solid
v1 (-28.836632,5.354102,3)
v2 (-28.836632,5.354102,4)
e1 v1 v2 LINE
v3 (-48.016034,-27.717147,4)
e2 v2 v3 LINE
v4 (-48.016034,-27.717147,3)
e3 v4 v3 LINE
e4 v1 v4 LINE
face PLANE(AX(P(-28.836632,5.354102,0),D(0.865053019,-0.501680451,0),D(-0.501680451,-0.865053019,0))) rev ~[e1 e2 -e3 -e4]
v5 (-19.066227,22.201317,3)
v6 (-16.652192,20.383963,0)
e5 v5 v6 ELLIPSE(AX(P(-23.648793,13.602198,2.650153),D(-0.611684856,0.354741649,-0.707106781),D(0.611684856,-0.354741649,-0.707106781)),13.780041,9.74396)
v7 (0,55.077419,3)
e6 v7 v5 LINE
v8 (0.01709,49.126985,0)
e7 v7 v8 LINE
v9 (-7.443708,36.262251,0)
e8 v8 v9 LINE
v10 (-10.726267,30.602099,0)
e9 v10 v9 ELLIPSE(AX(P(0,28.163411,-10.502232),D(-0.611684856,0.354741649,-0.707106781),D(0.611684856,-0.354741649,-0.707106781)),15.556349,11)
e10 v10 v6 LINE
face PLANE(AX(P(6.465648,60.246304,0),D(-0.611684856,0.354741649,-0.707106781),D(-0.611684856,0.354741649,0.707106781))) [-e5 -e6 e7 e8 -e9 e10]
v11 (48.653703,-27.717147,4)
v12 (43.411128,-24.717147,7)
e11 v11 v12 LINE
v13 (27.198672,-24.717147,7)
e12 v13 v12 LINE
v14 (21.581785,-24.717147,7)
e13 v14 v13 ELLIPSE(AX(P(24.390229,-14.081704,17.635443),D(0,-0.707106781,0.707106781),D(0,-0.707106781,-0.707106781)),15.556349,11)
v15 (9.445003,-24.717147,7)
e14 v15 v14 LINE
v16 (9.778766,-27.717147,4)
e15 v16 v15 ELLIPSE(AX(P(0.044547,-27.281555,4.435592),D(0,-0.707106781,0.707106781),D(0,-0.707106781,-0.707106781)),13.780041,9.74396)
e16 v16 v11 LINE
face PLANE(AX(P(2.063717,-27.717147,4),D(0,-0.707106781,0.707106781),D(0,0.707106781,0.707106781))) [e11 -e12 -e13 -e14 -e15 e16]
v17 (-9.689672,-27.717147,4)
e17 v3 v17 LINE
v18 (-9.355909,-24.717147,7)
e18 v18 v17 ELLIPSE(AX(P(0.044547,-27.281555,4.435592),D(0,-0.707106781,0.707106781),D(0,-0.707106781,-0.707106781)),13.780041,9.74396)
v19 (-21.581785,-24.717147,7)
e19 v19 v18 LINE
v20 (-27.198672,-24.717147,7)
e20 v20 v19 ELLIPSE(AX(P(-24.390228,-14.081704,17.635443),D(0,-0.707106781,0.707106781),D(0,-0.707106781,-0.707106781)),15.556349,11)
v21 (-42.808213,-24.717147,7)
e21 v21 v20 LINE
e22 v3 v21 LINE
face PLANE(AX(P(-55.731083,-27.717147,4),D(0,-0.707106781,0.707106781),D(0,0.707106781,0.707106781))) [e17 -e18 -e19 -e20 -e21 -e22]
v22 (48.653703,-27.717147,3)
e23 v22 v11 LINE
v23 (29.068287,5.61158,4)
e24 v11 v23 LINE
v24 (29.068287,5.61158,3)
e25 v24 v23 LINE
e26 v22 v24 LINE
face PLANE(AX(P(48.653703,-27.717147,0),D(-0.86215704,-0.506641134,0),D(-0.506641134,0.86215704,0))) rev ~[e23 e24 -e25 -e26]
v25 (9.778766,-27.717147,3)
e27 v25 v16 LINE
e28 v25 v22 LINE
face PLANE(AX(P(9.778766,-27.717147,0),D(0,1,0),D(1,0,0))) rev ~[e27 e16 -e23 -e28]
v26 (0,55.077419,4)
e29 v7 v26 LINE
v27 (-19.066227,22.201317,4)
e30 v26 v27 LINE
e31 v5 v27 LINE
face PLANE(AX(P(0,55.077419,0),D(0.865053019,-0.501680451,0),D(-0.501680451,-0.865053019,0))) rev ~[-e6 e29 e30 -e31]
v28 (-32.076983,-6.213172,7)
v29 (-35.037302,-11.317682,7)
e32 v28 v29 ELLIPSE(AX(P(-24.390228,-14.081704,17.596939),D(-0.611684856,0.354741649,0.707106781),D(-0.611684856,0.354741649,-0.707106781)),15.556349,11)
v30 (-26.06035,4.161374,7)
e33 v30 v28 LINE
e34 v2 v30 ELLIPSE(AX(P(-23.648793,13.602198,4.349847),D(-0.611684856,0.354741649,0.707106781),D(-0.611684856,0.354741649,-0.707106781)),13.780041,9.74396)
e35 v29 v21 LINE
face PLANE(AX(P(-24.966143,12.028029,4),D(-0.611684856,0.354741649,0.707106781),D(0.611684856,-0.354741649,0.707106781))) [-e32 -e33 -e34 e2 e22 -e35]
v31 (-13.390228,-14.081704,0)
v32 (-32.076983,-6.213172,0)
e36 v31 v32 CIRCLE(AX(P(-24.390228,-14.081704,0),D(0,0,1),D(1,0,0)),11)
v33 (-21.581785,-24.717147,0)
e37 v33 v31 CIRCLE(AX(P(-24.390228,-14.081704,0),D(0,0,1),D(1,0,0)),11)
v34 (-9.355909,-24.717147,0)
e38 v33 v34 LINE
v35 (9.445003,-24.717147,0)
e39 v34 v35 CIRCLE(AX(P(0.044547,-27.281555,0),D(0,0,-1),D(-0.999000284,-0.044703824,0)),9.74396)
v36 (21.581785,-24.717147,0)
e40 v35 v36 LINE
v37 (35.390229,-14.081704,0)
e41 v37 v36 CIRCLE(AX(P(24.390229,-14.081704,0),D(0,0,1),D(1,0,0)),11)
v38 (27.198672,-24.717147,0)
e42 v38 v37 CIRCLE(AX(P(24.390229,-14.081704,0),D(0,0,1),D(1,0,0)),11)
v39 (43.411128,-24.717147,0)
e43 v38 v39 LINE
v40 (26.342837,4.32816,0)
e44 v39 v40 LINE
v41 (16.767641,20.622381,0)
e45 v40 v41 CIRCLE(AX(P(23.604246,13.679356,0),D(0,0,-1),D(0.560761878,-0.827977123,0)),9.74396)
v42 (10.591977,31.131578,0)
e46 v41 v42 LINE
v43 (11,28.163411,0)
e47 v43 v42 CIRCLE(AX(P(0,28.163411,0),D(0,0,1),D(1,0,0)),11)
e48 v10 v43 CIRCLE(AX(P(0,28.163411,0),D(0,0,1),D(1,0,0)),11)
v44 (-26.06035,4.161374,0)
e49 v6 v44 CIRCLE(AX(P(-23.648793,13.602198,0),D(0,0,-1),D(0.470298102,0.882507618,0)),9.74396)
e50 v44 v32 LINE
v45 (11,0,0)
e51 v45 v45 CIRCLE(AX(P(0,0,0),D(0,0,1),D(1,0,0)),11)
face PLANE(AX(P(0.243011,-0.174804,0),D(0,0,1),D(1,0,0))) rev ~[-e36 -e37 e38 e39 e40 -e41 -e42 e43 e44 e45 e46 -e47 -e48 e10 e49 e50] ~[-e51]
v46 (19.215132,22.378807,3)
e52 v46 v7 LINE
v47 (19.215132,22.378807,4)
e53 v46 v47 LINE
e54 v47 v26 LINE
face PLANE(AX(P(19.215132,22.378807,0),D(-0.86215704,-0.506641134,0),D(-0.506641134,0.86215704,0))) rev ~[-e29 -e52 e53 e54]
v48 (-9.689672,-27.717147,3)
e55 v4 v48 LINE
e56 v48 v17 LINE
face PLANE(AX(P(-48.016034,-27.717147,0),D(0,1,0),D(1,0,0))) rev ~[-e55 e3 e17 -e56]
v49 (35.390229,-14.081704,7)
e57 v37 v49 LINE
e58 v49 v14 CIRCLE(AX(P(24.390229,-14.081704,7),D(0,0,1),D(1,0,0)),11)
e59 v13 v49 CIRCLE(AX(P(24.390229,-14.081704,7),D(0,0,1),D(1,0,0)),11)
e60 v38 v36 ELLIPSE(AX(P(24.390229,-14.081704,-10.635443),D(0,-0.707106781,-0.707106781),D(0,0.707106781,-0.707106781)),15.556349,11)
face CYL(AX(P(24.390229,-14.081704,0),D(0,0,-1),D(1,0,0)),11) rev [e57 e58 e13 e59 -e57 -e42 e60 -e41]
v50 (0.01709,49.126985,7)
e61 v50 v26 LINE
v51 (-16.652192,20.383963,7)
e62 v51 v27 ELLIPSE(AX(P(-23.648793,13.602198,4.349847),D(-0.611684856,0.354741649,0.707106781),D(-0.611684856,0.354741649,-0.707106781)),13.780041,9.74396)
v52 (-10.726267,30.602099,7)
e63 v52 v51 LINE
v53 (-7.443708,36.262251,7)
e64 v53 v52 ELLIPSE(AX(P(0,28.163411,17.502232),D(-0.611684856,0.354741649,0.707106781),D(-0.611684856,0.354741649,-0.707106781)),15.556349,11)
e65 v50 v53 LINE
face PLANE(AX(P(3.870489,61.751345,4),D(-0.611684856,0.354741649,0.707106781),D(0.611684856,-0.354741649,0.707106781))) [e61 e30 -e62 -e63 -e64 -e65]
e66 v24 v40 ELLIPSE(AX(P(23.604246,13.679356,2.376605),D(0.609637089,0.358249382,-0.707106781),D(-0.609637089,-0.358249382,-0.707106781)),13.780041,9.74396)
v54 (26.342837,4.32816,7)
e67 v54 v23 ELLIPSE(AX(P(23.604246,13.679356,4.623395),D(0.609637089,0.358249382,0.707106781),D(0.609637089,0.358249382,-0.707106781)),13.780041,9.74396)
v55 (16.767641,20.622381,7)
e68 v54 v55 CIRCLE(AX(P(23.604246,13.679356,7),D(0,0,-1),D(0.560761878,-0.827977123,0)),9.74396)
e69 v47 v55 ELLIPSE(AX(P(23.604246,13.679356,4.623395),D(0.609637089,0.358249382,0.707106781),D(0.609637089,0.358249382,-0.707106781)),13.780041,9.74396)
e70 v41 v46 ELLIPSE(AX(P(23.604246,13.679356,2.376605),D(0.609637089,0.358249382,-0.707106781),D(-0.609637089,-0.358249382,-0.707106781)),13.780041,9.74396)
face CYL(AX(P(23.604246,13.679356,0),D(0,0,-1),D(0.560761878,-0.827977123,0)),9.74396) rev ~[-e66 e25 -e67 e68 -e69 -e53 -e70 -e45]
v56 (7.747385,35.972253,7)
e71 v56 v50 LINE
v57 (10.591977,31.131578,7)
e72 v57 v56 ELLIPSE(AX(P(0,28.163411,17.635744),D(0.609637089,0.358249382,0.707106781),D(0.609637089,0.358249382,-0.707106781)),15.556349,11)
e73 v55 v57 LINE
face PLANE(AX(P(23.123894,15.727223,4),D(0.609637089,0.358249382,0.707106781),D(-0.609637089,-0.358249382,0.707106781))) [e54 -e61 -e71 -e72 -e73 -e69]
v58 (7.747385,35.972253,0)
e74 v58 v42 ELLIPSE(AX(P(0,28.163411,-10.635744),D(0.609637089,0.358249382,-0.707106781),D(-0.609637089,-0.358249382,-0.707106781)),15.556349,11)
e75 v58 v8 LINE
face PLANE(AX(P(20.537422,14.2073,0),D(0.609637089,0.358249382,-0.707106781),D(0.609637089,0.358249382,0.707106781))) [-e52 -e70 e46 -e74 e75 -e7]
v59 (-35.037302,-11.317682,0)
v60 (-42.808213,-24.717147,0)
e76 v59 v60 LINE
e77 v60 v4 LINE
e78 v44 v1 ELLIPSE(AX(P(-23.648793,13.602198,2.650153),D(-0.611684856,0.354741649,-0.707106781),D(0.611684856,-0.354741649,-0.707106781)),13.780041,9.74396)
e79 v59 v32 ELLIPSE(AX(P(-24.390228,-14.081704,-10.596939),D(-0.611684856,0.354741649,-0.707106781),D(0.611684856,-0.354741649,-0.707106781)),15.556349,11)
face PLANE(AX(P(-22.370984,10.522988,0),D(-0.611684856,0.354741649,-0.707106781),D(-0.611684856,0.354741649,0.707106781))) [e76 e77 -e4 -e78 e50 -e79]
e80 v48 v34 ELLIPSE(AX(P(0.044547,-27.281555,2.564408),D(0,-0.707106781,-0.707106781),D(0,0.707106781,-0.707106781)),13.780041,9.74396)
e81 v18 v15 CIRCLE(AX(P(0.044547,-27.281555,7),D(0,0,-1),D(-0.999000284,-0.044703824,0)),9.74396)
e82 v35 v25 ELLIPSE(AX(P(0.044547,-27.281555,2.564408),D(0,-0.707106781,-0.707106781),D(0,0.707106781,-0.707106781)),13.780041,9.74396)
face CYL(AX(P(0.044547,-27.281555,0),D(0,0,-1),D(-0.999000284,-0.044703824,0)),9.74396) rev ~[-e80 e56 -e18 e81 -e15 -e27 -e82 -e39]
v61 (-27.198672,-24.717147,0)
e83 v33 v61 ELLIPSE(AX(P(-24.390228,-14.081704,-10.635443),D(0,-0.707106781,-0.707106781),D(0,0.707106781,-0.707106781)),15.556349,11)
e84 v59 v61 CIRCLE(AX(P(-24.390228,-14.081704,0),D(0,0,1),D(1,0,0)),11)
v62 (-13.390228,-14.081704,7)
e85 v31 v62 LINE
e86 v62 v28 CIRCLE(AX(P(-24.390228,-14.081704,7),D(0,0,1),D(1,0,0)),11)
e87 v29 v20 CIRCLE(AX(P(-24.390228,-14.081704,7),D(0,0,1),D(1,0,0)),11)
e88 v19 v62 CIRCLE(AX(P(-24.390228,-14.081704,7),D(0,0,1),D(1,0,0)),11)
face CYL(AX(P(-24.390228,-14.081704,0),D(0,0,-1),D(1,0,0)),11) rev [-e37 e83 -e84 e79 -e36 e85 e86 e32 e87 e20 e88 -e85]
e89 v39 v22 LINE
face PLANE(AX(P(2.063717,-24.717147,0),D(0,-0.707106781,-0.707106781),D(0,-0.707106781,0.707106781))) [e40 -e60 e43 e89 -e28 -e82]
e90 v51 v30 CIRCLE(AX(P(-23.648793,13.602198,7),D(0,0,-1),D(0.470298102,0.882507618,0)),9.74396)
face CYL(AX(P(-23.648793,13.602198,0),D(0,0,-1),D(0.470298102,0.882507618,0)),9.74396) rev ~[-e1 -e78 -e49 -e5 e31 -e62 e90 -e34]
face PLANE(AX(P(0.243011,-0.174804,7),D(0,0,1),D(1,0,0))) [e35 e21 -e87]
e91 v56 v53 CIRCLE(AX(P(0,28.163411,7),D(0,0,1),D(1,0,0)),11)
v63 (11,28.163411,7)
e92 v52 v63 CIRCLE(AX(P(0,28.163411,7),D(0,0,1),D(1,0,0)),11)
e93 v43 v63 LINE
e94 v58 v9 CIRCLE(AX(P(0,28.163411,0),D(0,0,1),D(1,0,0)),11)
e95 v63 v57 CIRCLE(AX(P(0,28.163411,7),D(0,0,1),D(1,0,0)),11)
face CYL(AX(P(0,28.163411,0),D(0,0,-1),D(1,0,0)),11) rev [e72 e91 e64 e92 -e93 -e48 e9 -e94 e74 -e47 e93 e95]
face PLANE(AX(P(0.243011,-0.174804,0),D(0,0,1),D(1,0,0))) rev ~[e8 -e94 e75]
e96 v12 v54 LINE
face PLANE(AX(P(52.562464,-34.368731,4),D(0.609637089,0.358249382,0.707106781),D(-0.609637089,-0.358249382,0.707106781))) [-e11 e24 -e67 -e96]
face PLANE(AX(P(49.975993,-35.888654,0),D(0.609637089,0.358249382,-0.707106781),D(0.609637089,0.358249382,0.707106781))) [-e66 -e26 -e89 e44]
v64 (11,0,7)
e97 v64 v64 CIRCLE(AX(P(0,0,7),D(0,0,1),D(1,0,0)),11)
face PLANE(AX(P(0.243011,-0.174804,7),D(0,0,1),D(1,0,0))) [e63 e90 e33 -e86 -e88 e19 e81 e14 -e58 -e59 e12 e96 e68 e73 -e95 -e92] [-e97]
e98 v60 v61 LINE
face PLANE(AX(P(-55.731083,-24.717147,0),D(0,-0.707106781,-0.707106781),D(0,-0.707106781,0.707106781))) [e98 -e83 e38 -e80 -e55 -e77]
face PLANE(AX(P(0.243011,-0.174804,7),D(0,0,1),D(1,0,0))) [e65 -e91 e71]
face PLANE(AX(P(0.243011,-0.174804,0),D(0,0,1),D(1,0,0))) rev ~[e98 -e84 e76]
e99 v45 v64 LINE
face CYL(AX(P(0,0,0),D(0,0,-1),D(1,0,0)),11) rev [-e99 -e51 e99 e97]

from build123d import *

# Parameters (mm, degrees)
F0_R         = 11
F1_DEPTH     = 7
F2_T1_DEPTH  = 53.4348218988
F2_T3_DEPTH  = 53.3566125342
F2_T5_DEPTH  = 53.6604130231
F2_T7_DEPTH  = 53.7564599562
F2_T9_DEPTH  = 54.3050348939
F2_T11_DEPTH = 54.0874720662
F3_T1_DEPTH  = 53.4348218988
F3_T3_DEPTH  = 53.6604130231
F3_T5_DEPTH  = 53.7564599562
F3_T7_DEPTH  = 54.3050348939
F3_T9_DEPTH  = 54.0874720662
F3_T11_DEPTH = 53.3566125342


# Not quite as in the source:
# - a fillet or chamfer that OpenCascade refuses, or shapes differently, is made with other operations: its cross-section is extruded or revolved along the edge and cut away or added


with BuildPart() as f1:
    # F0 (on Top) → F1 (new body)
    with BuildSketch(Plane.XY):
        with BuildLine():
            Line((19.2151323873, 22.3788071315), (0, 55.077418685))
            Line((0, 55.077418685), (-19.066227053, 22.2013174855))
            ThreePointArc((-19.066227053, 22.2013174855), (-15.2197508504, 8.7138440156), (-28.8366321548, 5.35410246))
            Line((-28.8366321548, 5.35410246), (-48.0160338648, -27.7171470225))
            Line((-48.0160338648, -27.7171470225), (-9.6896718364, -27.7171470225))
            ThreePointArc((-9.6896718364, -27.7171470225), (0.0445471902, -17.5375945189), (9.7787662169, -27.7171470225))
            Line((9.7787662169, -27.7171470225), (48.6537031829, -27.7171470225))
            Line((48.6537031829, -27.7171470225), (29.0682872932, 5.6115802214))
            ThreePointArc((29.0682872932, 5.6115802214), (15.2034219667, 8.7426653076), (19.2151323873, 22.3788071315))
        make_face()
        with Locations((-24.3902284877, -14.0817042541)):
            Circle(F0_R, mode=Mode.SUBTRACT)
        Circle(F0_R, mode=Mode.SUBTRACT)
        with Locations((24.3902285123, -14.0817042399)):
            Circle(F0_R, mode=Mode.SUBTRACT)
        with Locations((0, 28.1634107232)):
            Circle(F0_R, mode=Mode.SUBTRACT)
    extrude(amount=F1_DEPTH)

    # F2: chamfer of 3 on 6 edges, made by hand

    # F2_s2 → F2_t1 (cut)
    with BuildSketch(Plane(origin=(27.7729977796, 47.8892799857, 0), x_dir=(0, 0, 1), z_dir=(-0.5016804508, -0.8650530188, 0))):
        Polygon((4, 27.6312642329), (7, 24.6312642329), (7, 27.6312642329), align=None)
    extrude(amount=F2_T1_DEPTH, mode=Mode.SUBTRACT)

    # F2_s4 → F2_t3 (cut)
    with BuildSketch(Plane(origin=(-0.9341553956, 1.5896629696, 0), x_dir=(0, 0, 1), z_dir=(-0.5066411345, 0.8621570396, 0))):
        Polygon((4, 27.9044858871), (7, 24.9044858871), (7, 27.9044858871), align=None)
    extrude(amount=F2_T3_DEPTH, mode=Mode.SUBTRACT)

    # F2_s6 → F2_t5 (cut)
    with BuildSketch(Plane(origin=(-1.0636343753, -1.8340362392, 0), x_dir=(0, 0, 1), z_dir=(-0.5016804508, -0.8650530188, 0))):
        Polygon((4, 27.6312642329), (7, 24.6312642329), (7, 27.6312642329), align=None)
    extrude(amount=F2_T5_DEPTH, mode=Mode.SUBTRACT)

    # F2_s8 → F2_t7 (cut)
    with BuildSketch(Plane.YZ.offset(-55.7310828287)):
        Polygon((-27.7171470225, 4), (-24.7171470225, 7), (-27.7171470225, 7), align=None)
    extrude(amount=F2_T7_DEPTH, mode=Mode.SUBTRACT)

    # F2_s10 → F2_t9 (cut)
    with BuildSketch(Plane.YZ.offset(2.063717253)):
        Polygon((-27.7171470225, 4), (-24.7171470225, 7), (-27.7171470225, 7), align=None)
    extrude(amount=F2_T9_DEPTH, mode=Mode.SUBTRACT)

    # F2_s12 → F2_t11 (cut)
    with BuildSketch(Plane(origin=(28.5044154, -48.5062911843, 0), x_dir=(0, 0, 1), z_dir=(-0.5066411345, 0.8621570396, 0))):
        Polygon((4, 27.9044858871), (7, 24.9044858871), (7, 27.9044858871), align=None)
    extrude(amount=F2_T11_DEPTH, mode=Mode.SUBTRACT)

    # F3: chamfer of 3 on 6 edges, made by hand

    # F3_s2 → F3_t1 (cut)
    with BuildSketch(Plane(origin=(27.7729977796, 47.8892799857, 0), x_dir=(0, 0, 1), z_dir=(-0.5016804508, -0.8650530188, 0))):
        Polygon((0, 24.6312642329), (3, 27.6312642329), (0, 27.6312642329), align=None)
    extrude(amount=F3_T1_DEPTH, mode=Mode.SUBTRACT)

    # F3_s4 → F3_t3 (cut)
    with BuildSketch(Plane(origin=(-1.0636343753, -1.8340362392, 0), x_dir=(0, 0, 1), z_dir=(-0.5016804508, -0.8650530188, 0))):
        Polygon((0, 24.6312642329), (3, 27.6312642329), (0, 27.6312642329), align=None)
    extrude(amount=F3_T3_DEPTH, mode=Mode.SUBTRACT)

    # F3_s6 → F3_t5 (cut)
    with BuildSketch(Plane.YZ.offset(-55.7310828287)):
        Polygon((-24.7171470225, 0), (-27.7171470225, 3), (-27.7171470225, 0), align=None)
    extrude(amount=F3_T5_DEPTH, mode=Mode.SUBTRACT)

    # F3_s8 → F3_t7 (cut)
    with BuildSketch(Plane.YZ.offset(2.063717253)):
        Polygon((-24.7171470225, 0), (-27.7171470225, 3), (-27.7171470225, 0), align=None)
    extrude(amount=F3_T7_DEPTH, mode=Mode.SUBTRACT)

    # F3_s10 → F3_t9 (cut)
    with BuildSketch(Plane(origin=(28.5044154, -48.5062911843, 0), x_dir=(0, 0, 1), z_dir=(-0.5066411345, 0.8621570396, 0))):
        Polygon((0, 24.9044858871), (3, 27.9044858871), (0, 27.9044858871), align=None)
    extrude(amount=F3_T9_DEPTH, mode=Mode.SUBTRACT)

    # F3_s12 → F3_t11 (cut)
    with BuildSketch(Plane(origin=(-0.9341553956, 1.5896629696, 0), x_dir=(0, 0, 1), z_dir=(-0.5066411345, 0.8621570396, 0))):
        Polygon((0, 24.9044858871), (3, 27.9044858871), (0, 27.9044858871), align=None)
    extrude(amount=F3_T11_DEPTH, mode=Mode.SUBTRACT)


solid = f1.part
